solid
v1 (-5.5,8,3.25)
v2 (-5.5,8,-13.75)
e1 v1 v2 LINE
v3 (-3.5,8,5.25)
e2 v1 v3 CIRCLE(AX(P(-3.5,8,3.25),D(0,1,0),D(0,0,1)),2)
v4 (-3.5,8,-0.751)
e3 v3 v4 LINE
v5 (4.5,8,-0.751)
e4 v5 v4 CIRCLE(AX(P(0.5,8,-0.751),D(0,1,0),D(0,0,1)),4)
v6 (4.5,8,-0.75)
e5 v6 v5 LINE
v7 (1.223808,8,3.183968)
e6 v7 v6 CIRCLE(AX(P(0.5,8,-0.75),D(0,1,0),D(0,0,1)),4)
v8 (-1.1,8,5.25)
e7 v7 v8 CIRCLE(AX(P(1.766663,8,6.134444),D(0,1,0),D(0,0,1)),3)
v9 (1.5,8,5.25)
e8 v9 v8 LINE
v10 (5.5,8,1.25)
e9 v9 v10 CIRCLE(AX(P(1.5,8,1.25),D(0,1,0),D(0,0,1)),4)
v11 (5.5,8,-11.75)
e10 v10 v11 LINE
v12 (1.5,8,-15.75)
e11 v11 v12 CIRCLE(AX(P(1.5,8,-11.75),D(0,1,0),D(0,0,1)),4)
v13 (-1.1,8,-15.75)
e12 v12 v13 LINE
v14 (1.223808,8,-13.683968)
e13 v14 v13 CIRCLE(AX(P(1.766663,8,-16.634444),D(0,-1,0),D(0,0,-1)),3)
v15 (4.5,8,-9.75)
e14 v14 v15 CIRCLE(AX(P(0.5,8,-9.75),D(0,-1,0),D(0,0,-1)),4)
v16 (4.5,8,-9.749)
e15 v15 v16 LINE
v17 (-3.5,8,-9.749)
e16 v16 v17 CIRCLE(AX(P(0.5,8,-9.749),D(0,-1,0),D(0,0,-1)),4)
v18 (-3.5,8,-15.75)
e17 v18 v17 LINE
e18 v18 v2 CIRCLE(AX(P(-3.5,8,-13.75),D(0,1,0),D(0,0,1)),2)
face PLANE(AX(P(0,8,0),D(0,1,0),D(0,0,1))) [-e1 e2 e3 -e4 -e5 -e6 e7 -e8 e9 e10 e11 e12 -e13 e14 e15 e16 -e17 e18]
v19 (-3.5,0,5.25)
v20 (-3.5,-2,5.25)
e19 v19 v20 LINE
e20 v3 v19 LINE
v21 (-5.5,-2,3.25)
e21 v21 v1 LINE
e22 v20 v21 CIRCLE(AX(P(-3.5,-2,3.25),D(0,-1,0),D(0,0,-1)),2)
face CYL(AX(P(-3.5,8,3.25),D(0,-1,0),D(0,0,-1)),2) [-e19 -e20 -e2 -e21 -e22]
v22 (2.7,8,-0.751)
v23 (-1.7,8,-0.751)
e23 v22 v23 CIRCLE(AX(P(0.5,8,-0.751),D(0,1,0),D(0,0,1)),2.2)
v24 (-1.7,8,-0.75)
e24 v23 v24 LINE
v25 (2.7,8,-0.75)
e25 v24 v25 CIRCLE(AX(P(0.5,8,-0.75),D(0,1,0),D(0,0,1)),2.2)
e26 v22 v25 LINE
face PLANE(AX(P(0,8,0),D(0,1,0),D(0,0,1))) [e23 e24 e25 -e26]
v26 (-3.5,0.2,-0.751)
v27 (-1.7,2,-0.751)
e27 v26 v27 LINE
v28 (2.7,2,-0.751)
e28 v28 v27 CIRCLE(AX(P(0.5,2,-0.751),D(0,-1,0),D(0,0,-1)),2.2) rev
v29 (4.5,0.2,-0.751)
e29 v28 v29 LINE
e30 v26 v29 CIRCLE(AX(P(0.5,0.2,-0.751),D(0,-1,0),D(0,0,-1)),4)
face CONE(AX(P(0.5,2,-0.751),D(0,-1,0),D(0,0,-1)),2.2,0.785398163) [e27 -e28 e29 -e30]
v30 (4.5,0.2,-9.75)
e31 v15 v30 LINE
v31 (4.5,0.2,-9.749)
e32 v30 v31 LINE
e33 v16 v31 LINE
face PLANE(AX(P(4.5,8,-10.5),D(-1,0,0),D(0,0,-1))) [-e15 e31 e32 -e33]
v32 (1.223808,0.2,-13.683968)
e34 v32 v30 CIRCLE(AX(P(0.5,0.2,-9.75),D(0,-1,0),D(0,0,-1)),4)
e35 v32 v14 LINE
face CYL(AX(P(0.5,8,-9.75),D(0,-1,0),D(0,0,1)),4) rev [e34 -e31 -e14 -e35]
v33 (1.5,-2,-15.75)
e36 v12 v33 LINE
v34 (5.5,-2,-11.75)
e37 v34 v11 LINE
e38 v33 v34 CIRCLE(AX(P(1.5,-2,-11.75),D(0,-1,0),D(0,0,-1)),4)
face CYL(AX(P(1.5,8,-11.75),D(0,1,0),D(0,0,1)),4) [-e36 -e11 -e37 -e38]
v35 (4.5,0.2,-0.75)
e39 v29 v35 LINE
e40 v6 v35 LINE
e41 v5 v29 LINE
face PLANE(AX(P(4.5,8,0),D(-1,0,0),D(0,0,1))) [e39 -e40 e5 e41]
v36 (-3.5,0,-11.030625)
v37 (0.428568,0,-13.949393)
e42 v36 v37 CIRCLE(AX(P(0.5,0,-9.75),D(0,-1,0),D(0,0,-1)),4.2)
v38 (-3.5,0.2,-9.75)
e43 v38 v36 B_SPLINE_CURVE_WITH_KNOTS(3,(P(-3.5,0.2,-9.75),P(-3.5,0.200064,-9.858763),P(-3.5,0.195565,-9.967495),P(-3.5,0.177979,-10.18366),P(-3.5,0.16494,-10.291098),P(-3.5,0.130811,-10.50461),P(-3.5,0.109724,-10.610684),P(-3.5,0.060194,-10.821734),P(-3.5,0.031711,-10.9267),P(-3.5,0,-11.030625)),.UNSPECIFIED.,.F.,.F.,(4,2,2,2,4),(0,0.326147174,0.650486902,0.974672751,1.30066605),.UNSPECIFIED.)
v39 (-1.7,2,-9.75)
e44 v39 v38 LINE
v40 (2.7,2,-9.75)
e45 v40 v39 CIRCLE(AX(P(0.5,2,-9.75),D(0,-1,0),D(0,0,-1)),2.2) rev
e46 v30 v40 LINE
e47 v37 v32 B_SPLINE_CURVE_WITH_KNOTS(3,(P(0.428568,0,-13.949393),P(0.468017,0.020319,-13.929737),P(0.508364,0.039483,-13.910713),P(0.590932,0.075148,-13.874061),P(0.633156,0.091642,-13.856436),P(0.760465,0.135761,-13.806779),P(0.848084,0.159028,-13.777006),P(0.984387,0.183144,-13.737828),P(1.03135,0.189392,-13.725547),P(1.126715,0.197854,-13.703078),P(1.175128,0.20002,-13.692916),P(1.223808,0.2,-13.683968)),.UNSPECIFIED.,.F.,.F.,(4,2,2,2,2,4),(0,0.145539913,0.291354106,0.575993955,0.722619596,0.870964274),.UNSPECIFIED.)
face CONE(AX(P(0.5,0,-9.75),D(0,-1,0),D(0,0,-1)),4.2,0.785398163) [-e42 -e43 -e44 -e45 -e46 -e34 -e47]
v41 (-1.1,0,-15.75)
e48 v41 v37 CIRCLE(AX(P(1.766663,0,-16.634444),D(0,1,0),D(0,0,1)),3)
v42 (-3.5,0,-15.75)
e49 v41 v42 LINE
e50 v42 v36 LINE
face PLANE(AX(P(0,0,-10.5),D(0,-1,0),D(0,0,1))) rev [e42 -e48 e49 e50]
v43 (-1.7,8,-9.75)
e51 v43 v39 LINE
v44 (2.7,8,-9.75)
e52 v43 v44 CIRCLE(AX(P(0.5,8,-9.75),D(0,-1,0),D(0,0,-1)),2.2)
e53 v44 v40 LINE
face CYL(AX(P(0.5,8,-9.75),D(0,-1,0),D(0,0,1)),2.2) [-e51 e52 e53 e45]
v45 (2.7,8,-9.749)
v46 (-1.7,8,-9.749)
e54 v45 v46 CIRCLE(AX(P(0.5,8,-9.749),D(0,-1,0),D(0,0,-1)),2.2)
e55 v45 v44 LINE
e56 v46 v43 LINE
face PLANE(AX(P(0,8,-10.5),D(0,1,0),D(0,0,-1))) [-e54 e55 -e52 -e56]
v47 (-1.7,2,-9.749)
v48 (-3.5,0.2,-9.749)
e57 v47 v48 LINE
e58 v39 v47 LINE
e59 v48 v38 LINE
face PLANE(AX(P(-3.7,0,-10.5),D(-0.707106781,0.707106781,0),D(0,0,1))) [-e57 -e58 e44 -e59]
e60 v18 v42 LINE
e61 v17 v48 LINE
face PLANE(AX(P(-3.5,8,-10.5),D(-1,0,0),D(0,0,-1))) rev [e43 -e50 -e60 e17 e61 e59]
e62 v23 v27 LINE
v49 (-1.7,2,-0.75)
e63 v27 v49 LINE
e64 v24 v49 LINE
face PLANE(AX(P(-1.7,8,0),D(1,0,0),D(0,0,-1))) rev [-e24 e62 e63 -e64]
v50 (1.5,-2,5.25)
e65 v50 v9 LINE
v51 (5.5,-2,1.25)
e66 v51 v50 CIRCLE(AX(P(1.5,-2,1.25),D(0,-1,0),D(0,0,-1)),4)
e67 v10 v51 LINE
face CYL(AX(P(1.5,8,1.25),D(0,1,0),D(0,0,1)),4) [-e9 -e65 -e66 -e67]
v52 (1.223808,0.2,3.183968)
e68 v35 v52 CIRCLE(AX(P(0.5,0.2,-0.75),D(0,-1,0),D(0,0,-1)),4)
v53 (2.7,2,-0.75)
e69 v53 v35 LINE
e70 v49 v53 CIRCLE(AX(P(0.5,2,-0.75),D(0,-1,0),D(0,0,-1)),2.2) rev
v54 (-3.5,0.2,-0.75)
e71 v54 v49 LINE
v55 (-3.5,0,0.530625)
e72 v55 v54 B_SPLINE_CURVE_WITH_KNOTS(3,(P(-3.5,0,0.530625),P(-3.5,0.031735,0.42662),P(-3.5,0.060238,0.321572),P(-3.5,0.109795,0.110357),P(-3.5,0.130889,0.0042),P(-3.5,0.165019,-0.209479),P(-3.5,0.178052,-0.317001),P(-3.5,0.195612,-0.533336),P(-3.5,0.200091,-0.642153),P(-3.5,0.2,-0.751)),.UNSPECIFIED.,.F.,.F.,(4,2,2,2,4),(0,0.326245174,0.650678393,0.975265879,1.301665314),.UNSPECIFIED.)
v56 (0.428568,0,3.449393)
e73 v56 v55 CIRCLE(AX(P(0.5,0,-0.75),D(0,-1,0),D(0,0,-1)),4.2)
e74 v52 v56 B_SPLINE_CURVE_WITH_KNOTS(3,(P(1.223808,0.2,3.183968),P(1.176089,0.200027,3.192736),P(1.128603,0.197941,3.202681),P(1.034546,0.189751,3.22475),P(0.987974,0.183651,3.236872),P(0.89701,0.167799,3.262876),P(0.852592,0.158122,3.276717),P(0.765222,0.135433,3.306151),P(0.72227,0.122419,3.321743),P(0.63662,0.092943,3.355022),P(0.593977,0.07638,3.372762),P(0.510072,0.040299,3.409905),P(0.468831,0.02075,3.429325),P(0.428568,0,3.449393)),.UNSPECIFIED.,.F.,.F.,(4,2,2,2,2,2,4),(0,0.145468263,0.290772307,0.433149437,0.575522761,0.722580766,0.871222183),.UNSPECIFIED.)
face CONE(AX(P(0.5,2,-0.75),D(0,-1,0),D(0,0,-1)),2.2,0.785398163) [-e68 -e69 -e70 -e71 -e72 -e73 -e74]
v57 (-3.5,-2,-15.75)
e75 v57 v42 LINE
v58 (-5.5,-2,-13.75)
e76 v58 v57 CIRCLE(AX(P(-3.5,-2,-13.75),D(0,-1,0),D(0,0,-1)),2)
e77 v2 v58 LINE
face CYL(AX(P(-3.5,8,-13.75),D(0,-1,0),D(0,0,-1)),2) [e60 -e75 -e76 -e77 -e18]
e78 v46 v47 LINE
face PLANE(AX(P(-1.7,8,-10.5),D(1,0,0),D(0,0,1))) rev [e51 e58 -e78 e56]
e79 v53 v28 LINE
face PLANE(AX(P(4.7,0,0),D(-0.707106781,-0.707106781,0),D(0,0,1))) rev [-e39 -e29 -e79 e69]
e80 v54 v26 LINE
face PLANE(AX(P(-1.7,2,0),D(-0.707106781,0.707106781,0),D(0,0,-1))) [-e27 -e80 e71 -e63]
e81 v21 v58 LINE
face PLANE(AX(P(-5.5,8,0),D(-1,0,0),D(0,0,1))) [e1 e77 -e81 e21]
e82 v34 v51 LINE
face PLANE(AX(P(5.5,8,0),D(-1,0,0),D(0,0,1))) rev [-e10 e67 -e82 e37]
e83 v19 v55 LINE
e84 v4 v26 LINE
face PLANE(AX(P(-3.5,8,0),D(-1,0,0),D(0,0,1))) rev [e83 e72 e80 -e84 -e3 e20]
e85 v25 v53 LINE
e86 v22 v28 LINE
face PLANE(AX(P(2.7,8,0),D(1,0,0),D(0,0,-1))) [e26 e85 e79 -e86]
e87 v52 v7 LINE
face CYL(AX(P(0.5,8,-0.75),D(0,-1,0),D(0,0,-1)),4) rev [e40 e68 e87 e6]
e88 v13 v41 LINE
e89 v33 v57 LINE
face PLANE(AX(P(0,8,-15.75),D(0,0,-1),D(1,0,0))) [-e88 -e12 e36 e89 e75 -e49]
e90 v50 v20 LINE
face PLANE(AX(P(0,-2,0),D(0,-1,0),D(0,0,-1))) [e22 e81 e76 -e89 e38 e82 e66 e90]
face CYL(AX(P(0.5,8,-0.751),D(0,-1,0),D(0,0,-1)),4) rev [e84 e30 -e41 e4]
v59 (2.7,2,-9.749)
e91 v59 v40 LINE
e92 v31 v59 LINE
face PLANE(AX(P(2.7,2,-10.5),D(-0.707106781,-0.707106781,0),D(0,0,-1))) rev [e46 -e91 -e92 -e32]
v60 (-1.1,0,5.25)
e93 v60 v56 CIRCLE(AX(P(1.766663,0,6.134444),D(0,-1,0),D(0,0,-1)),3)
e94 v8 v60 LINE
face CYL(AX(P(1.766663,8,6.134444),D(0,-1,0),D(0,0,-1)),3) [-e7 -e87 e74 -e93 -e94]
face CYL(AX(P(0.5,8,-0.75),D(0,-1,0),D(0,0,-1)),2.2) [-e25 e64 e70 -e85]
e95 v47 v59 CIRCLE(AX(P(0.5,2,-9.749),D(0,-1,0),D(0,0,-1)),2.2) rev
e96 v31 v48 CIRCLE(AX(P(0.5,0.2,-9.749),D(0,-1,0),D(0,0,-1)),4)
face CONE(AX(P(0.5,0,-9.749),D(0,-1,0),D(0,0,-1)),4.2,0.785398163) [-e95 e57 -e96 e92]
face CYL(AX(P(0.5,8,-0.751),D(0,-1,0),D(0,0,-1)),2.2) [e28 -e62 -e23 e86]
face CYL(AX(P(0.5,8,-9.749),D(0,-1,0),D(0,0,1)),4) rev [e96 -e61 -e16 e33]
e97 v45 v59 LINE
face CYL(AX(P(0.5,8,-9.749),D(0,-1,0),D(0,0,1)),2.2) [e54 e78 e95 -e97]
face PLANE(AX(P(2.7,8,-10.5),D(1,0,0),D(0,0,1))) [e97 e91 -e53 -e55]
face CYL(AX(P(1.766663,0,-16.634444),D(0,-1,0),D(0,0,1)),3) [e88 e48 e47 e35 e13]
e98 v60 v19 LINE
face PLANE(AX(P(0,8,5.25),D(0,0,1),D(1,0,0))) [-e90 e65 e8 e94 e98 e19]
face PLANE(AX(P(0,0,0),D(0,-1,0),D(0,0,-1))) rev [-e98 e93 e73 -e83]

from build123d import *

# Parameters (mm, degrees)
BOSS_EXTRUDE3_DEPTH   = 8
BOSS_EXTRUDE3_2_DEPTH = 8
SKETCH4_W             = 11
SKETCH4_H             = 10.5
BOSS_EXTRUDE4_DEPTH   = 2
FILLET3_R             = 3
MIRROR2_START         = -2
MIRROR2_DEPTH         = 10
MIRROR2_2_DEPTH       = 2
CHAMFER1_SIZE         = 2
FILLET4_R             = 4
FILLET5_R             = 2


# Read off the part's stored shape, not the designer's step: Mirror2
with BuildPart() as part:
    # Sketch3 → Boss-Extrude3 (new body)
    with BuildSketch(Plane(origin=(0, 0, 0), x_dir=(1, 0, 0), z_dir=(0, 1, 0))):
        with BuildLine():
            Line((-1.1, -5.25), (5.5, -5.25))
            Line((5.5, -5.25), (5.5, 5.25))
            Line((5.5, 5.25), (-5.5, 5.25))
            Line((-5.5, 5.25), (-5.5, -5.25))
            Line((-5.5, -5.25), (-3.5, -5.25))
            Line((-3.5, -5.25), (-3.5, 0.751))
            ThreePointArc((-3.5, 0.751), (0.5, 4.751), (4.5, 0.751))
            Line((4.5, 0.751), (4.5, 0.75))
            ThreePointArc((4.5, 0.75), (2.69089023, -2.596640106), (-1.1, -2.916060556))
            Line((-1.1, -2.916060556), (-1.1, -5.25))
        make_face()
    extrude(amount=BOSS_EXTRUDE3_DEPTH)



with BuildPart() as body_2:
    # Sketch3 → Boss-Extrude3 2 (new body)
    with BuildSketch(Plane(origin=(0, 0, 0), x_dir=(1, 0, 0), z_dir=(0, 1, 0))):
        with BuildLine():
            ThreePointArc((-1.7, 0.75), (0.5, -1.45), (2.7, 0.75))
            Line((2.7, 0.75), (2.7, 0.751))
            ThreePointArc((2.7, 0.751), (0.5, 2.951), (-1.7, 0.751))
            Line((-1.7, 0.751), (-1.7, 0.75))
        make_face()
    extrude(amount=BOSS_EXTRUDE3_2_DEPTH)


with BuildPart() as part_1:
    add(part.part)

    add(body_2.part)  # Boss-Extrude4 merges body 2
    # Sketch4 → Boss-Extrude4 (add)
    with BuildSketch(Plane(origin=(0, 0, 0), x_dir=(-1, 0, 0), z_dir=(0, -1, 0))):
        Rectangle(SKETCH4_W, SKETCH4_H)
    extrude(amount=BOSS_EXTRUDE4_DEPTH)

    # Fillet3
    # the kernel refuses this fillet: 3 mm, written as the material it takes off along each edge
    with BuildSketch(Plane(origin=(-1.1, 0, 2.916060556), x_dir=(1.3123233716119625e-12, 0, 1.0), z_dir=(0, 1, 0))) as fillet3_piece_1:
        with BuildLine():
            CenterArc((3.21838304, 2.866663483), FILLET3_R, 190.425211714, 62.42837206)
            ThreePointArc((0.267907213, 2.323807705), (0.307618872, 1.141882326), (0, 0))
            Line((0, 0), (2.333939444, 0))
        make_face()
    extrude(amount=13.847999938, mode=Mode.SUBTRACT)

    # Mirror2 outline → Mirror2 (add)
    with BuildSketch(Plane(origin=(0, 0, 0), x_dir=(1, 0, 0), z_dir=(0, 1, 0)).offset(MIRROR2_START)):
        with BuildLine():
            ThreePointArc((1.223807705, 13.683967769), (3.573697352, 12.309762604), (4.5, 9.75))
            Line((4.5, 9.75), (4.5, 9.749))
            ThreePointArc((4.5, 9.749), (0.5, 5.749), (-3.5, 9.749))
            Line((-3.5, 9.749), (-3.5, 15.75))
            Line((-3.5, 15.75), (-5.5, 15.75))
            Line((-5.5, 15.75), (-5.5, 5.25))
            Line((-5.5, 5.25), (5.5, 5.25))
            Line((5.5, 5.25), (5.5, 15.75))
            Line((5.5, 15.75), (-1.1, 15.75))
            ThreePointArc((-1.1, 15.75), (-0.226657287, 14.392419442), (1.223807705, 13.683967769))
        make_face()
        with BuildLine():
            ThreePointArc((-1.7, 9.749), (0.5, 7.549), (2.7, 9.749))
            Line((2.7, 9.749), (2.7, 9.75))
            ThreePointArc((2.7, 9.75), (0.5, 11.95), (-1.7, 9.75))
            Line((-1.7, 9.75), (-1.7, 9.749))
        make_face()
    extrude(amount=MIRROR2_DEPTH)

    # Mirror2 2 outline → Mirror2 2 (add)
    with BuildSketch(Plane(origin=(0, 0, 0), x_dir=(1, 0, 0), z_dir=(0, 1, 0)).offset(MIRROR2_START)):
        with BuildLine():
            Line((4.5, 9.749), (4.5, 9.75))
            ThreePointArc((4.5, 9.75), (3.573697352, 12.309762604), (1.223807705, 13.683967769))
            ThreePointArc((1.223807705, 13.683967769), (-0.226657287, 14.392419442), (-1.1, 15.75))
            Line((-1.1, 15.75), (-3.5, 15.75))
            Line((-3.5, 15.75), (-3.5, 9.749))
            ThreePointArc((-3.5, 9.749), (0.5, 5.749), (4.5, 9.749))
        make_face()
        with BuildLine():
            Line((2.7, 9.75), (2.7, 9.749))
            ThreePointArc((2.7, 9.749), (0.5, 7.549), (-1.7, 9.749))
            Line((-1.7, 9.749), (-1.7, 9.75))
            ThreePointArc((-1.7, 9.75), (0.5, 11.95), (2.7, 9.75))
        make_face(mode=Mode.SUBTRACT)
    extrude(amount=MIRROR2_2_DEPTH)

    # Chamfer1
    # the kernel refuses this chamfer: 2 mm, written as the material it adds along each edge
    with BuildSketch(Plane(origin=(0.5, 0, -9.749), x_dir=(1, 0, 0), z_dir=(0, 0, -1))) as chamfer1_piece_1:
        Polygon((2.2 + CHAMFER1_SIZE, 0), (2.2, -CHAMFER1_SIZE), (2.2, 0), align=None)
    revolve(axis=Axis((0.5, 0, -9.749), (0, -1, 0)), revolution_arc=180)
    with BuildSketch(Plane(origin=(-1.7, 0, -9.749), x_dir=(-0.9996219169112968, -0.027495876610586365, 0), z_dir=(0, 0, -1)), Plane(origin=(2.7, 0, -9.75), x_dir=(0.9996219169112968, -0.027495876610586365, 0), z_dir=(0, 0, 1))) as chamfer1_piece_2:
        Polygon((CHAMFER1_SIZE * 0.999621916911, CHAMFER1_SIZE * 0.0274958766106), (-CHAMFER1_SIZE * 0.0274958766106, CHAMFER1_SIZE * 0.999621916911), (0, 0), align=None)
    extrude(amount=0.001)
    with BuildSketch(Plane(origin=(0.5, 0, -9.75), x_dir=(-1, 0, 0), z_dir=(0, 0, 1))) as chamfer1_piece_3:
        Polygon((2.2 + CHAMFER1_SIZE, 0), (2.2, -CHAMFER1_SIZE), (2.2, 0), align=None)
    revolve(axis=Axis((0.5, 0, -9.75), (0, -1, 0)), revolution_arc=180)
    with BuildSketch(Plane(origin=(0.5, 0, -0.751), x_dir=(1, 0, 0), z_dir=(0, 0, 1))) as chamfer1_piece_4:
        Polygon((2.2 + CHAMFER1_SIZE, 0), (2.2, CHAMFER1_SIZE), (2.2, 0), align=None)
    revolve(axis=Axis((0.5, 0, -0.751), (0, 1, 0)), revolution_arc=180)
    with BuildSketch(Plane(origin=(-1.7, 0, -0.751), x_dir=(-0.9996219169112968, -0.027495876610586372, 0), z_dir=(0, 0, 1)), Plane(origin=(2.7, 0, -0.75), x_dir=(0.9996219169112968, -0.027495876610586358, 0), z_dir=(0, 0, -1))) as chamfer1_piece_5:
        Polygon((CHAMFER1_SIZE * 0.999621916911, -CHAMFER1_SIZE * 0.0274958766106), (-CHAMFER1_SIZE * 0.0274958766106, -CHAMFER1_SIZE * 0.999621916911), (0, 0), align=None)
    extrude(amount=0.001)
    with BuildSketch(Plane(origin=(0.5, 0, -0.75), x_dir=(-1, 0, 0), z_dir=(0, 0, -1))) as chamfer1_piece_6:
        Polygon((2.2 + CHAMFER1_SIZE, 0), (2.2, CHAMFER1_SIZE), (2.2, 0), align=None)
    revolve(axis=Axis((0.5, 0, -0.75), (0, 1, 0)), revolution_arc=180)

    # Fillet4
    fillet4_edges = [part_1.edges().sort_by_distance(p)[0] for p in [
        (5.5, 3, 5.25),
        (5.5, 3, -15.75),
    ]]
    fillet(fillet4_edges, radius=FILLET4_R)

    # Fillet5
    fillet5_edges = [part_1.edges().sort_by_distance(p)[0] for p in [
        (-5.5, 3, -15.75),
        (-5.5, 3, 5.25),
    ]]
    fillet(fillet5_edges, radius=FILLET5_R)


solid = part_1.part
